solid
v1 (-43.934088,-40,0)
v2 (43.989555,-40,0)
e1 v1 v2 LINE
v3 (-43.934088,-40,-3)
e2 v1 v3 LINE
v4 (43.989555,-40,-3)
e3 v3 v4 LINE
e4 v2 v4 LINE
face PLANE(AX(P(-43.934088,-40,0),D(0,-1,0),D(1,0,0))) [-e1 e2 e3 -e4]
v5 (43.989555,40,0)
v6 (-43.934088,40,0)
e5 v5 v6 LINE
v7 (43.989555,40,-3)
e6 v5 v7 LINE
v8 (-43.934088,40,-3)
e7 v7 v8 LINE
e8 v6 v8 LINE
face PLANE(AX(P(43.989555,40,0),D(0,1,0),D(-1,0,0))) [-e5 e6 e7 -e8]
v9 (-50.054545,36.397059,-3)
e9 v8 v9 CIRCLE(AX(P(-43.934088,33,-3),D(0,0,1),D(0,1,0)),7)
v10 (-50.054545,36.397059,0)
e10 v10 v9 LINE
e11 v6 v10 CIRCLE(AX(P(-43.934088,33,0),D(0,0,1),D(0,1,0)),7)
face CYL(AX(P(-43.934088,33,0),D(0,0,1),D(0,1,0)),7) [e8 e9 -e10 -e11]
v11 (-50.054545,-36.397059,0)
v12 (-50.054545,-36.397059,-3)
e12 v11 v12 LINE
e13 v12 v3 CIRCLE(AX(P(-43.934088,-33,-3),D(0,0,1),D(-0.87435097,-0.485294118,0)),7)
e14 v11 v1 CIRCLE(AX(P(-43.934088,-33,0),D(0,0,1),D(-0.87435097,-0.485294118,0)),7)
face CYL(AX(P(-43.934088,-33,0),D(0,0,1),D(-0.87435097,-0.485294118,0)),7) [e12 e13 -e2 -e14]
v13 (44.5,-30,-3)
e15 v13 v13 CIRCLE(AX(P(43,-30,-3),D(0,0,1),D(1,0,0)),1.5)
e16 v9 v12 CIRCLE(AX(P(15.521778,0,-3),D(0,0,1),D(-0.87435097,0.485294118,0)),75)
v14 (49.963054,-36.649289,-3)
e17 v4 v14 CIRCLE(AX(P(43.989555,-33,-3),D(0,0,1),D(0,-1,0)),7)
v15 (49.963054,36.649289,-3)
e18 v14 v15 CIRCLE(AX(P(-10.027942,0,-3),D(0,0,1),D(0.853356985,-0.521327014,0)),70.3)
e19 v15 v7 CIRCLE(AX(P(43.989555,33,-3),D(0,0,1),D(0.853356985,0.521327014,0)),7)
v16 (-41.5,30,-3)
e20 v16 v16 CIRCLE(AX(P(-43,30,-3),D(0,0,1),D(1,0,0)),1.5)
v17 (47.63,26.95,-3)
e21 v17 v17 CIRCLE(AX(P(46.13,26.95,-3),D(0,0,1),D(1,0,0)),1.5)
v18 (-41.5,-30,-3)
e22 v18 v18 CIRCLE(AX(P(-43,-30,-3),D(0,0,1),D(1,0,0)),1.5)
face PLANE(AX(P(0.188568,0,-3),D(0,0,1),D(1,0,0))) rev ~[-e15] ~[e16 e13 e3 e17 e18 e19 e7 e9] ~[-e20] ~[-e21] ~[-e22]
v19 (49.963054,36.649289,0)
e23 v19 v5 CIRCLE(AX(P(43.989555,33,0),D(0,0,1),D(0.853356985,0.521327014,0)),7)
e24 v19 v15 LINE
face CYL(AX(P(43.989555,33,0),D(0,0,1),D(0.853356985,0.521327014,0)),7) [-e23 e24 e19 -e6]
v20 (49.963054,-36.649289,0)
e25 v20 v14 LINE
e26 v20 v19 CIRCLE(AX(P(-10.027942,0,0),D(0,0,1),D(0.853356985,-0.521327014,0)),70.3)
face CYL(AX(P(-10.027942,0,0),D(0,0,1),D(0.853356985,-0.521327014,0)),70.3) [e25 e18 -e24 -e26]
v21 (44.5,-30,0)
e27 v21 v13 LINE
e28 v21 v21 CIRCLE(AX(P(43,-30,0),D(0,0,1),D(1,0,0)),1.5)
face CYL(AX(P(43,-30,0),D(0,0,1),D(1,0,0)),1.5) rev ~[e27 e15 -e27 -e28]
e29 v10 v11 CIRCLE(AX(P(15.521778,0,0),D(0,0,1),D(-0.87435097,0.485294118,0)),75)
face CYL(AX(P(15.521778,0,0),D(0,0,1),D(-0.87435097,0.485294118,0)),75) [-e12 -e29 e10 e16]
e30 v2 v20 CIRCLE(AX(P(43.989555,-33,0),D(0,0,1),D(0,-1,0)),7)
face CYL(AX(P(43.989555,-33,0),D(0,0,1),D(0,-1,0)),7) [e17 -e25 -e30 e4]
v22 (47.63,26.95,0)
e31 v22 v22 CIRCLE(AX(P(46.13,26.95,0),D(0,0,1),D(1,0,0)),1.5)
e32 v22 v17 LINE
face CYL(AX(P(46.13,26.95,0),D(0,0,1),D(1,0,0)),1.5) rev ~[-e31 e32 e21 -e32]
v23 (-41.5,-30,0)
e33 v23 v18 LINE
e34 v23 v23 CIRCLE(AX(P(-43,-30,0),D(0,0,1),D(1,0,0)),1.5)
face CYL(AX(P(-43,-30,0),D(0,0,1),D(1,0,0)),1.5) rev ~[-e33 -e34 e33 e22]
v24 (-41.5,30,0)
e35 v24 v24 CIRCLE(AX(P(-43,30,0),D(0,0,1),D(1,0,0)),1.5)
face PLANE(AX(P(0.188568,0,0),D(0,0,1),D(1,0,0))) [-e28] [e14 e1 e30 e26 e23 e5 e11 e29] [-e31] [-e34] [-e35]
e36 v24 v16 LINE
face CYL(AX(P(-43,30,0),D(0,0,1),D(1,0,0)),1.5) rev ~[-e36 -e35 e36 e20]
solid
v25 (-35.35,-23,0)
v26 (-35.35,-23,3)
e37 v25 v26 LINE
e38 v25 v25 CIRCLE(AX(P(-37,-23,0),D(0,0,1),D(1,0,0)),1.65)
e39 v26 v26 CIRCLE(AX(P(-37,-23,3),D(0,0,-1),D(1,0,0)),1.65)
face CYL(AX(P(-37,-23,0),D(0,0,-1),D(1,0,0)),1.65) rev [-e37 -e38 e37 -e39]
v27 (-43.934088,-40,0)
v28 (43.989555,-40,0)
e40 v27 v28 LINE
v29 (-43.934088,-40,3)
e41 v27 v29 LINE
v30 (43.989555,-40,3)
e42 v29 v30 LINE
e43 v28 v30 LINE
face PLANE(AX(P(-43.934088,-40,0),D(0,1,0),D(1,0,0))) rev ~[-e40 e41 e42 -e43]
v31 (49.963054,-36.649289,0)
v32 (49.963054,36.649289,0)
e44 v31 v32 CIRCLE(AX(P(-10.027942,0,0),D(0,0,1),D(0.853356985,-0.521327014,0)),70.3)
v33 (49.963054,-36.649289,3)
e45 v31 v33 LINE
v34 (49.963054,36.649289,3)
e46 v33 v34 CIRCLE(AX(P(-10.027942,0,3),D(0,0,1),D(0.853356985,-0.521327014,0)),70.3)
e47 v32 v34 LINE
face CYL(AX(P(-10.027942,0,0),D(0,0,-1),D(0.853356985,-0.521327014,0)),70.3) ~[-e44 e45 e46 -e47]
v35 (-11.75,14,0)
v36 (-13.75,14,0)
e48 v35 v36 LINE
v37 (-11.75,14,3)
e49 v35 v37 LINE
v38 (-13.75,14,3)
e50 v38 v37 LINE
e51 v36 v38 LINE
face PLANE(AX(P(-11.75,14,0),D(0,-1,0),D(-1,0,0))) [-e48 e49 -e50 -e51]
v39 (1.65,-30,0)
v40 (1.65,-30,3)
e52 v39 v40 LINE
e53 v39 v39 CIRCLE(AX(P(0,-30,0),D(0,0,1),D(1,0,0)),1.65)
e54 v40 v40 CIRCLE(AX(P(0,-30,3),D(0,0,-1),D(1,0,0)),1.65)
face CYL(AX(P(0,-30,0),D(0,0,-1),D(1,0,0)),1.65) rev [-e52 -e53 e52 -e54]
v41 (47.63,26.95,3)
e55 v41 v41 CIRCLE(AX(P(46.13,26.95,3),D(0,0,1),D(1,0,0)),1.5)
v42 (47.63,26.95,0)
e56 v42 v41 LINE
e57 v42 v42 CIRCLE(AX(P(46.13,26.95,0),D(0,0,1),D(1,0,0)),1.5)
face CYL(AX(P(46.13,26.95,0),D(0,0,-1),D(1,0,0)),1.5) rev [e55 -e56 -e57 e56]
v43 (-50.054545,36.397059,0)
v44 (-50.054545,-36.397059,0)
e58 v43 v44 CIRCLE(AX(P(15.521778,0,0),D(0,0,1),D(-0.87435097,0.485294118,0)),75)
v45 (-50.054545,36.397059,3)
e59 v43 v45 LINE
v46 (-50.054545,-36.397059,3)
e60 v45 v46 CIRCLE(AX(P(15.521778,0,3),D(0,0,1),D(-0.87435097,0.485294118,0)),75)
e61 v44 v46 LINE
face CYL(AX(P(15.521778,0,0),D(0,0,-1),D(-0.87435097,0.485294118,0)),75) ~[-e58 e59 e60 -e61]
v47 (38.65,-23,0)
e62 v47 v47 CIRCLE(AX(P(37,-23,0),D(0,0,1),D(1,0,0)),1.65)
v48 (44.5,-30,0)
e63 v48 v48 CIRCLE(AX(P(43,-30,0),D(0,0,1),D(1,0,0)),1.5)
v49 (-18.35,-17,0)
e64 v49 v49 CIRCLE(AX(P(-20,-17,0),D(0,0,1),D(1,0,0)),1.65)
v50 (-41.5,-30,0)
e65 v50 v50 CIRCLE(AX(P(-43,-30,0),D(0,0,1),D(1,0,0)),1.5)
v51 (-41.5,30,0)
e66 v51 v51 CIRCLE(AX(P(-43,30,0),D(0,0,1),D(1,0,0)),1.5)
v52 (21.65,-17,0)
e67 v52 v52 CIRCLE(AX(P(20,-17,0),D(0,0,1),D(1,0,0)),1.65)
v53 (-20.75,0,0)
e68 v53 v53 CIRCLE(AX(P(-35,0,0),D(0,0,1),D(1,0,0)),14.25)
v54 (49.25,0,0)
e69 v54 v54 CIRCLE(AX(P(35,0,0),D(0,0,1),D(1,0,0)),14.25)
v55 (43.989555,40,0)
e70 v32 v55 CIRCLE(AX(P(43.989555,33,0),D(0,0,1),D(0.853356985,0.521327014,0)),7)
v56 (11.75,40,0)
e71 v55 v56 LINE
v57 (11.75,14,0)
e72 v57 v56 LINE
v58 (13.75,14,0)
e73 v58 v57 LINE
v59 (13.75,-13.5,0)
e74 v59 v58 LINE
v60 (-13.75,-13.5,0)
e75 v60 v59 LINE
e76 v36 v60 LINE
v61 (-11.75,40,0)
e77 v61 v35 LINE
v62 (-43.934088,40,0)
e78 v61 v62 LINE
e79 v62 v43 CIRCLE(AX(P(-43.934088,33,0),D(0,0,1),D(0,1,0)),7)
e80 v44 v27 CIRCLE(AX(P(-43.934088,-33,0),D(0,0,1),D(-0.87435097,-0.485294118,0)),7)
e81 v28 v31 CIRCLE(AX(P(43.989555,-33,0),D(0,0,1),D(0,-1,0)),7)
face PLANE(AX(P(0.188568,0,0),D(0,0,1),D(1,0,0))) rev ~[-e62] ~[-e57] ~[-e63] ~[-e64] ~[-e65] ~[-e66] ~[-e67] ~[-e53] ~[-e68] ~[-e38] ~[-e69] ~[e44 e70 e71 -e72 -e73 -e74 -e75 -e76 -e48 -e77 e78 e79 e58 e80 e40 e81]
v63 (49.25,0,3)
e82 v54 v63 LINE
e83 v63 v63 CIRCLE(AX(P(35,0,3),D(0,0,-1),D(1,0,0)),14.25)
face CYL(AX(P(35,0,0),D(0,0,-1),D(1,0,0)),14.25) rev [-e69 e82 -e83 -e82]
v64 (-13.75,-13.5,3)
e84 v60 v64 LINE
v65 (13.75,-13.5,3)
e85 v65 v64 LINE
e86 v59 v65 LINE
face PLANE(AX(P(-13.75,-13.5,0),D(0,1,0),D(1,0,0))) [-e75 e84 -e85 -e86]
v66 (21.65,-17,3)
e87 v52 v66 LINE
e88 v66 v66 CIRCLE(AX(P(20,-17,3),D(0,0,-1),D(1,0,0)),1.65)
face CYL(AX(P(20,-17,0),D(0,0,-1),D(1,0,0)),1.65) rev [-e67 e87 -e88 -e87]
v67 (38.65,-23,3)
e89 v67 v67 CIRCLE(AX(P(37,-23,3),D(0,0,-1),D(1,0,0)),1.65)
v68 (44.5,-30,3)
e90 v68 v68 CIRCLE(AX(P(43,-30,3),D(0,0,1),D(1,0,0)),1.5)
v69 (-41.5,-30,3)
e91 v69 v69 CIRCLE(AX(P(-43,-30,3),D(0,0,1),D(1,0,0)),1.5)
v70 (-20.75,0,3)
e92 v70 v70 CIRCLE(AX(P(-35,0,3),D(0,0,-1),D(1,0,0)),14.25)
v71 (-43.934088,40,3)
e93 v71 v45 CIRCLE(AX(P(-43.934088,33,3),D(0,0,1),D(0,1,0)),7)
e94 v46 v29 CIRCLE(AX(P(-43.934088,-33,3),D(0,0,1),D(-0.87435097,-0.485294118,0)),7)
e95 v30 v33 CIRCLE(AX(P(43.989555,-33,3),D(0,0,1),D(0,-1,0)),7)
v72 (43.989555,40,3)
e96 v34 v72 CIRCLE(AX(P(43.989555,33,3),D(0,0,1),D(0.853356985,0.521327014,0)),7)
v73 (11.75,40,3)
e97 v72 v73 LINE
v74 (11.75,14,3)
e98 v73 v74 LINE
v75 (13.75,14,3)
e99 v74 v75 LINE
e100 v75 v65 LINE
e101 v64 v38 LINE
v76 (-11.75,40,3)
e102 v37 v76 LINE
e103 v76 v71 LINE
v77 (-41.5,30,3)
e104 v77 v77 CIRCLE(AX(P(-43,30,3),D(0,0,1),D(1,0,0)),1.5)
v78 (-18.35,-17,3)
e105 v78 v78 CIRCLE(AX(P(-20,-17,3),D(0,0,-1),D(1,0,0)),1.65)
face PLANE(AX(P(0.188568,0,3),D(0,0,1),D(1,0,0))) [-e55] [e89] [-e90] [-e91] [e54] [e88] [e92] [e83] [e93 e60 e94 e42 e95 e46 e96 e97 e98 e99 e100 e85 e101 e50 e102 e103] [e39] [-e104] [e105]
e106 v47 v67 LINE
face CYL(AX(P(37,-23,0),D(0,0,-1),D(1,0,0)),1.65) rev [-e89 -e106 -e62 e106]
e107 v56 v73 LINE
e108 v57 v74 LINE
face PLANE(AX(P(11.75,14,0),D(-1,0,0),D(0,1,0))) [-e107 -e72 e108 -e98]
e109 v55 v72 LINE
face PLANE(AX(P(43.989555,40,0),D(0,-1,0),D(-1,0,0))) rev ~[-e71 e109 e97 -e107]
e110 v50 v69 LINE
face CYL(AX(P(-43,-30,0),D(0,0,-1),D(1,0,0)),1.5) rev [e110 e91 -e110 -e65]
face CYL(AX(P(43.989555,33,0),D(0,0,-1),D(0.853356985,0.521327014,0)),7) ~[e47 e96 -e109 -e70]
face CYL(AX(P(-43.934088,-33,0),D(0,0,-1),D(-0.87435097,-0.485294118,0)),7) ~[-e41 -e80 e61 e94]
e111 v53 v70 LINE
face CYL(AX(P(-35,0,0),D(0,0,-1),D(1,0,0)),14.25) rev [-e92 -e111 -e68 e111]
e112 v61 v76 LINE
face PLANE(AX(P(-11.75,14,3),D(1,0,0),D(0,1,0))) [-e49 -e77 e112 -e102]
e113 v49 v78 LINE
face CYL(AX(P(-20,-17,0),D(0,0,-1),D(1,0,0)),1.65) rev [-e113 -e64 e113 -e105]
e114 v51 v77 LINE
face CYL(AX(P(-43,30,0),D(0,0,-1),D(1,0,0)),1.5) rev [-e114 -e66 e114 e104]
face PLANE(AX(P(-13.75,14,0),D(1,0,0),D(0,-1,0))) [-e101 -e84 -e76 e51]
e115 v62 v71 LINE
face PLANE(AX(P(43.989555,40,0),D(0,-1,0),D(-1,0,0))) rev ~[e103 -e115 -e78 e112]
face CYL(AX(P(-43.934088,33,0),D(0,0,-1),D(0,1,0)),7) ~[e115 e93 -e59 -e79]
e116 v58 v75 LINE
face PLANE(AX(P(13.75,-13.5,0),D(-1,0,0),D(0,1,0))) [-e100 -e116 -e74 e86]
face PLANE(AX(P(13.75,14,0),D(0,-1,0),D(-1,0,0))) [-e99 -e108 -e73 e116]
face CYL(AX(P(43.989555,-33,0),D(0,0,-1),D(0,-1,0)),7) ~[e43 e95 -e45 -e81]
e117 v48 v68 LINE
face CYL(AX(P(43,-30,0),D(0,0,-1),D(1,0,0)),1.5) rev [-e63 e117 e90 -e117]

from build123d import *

# Parameters (mm, degrees)
F0_R     = 1.5
F1_DEPTH = 3
F2_DEPTH = 3
F3_R     = 14.25
F3_R_2   = 1.65
F4_DEPTH = 25
F6_DEPTH = 3
F7_DEPTH = 3
F8_W     = 23.5
F8_H     = 37.6963340342
F9_DEPTH = 25


with BuildPart() as f1:
    # F0 (on Top) → F1 (new body)
    with BuildSketch(Plane.XY):
        with BuildLine():
            Line((45.1, 35), (-45.1, 35))
            ThreePointArc((-45.1, 35), (-54.4782217351, 0), (-45.1, -35))
            Line((-45.1, -35), (45.1, -35))
            ThreePointArc((45.1, -35), (55.2720579016, 0), (45.1, 35))
        make_face()
        with Locations((-43, -30)):
            Circle(F0_R, mode=Mode.SUBTRACT)
        with Locations((43, -30)):
            Circle(F0_R, mode=Mode.SUBTRACT)
        with Locations((-43, 30)):
            Circle(F0_R, mode=Mode.SUBTRACT)
        with Locations((46.13, 26.95)):
            Circle(F0_R, mode=Mode.SUBTRACT)
    extrude(amount=-F1_DEPTH)

    # F5 (on Top) → F6 (join)
    with BuildSketch(Plane.XY):
        with BuildLine():
            ThreePointArc((-50.0545445124, 36.3970588235), (-59.4782217351, 0), (-50.0545445124, -36.3970588235))
            ThreePointArc((-50.0545445124, -36.3970588235), (-47.4851853132, -39.0323880746), (-43.9340877199, -40))
            Line((-43.9340877199, -40), (43.9895550669, -40))
            ThreePointArc((43.9895550669, -40), (47.4140971022, -39.1051217718), (49.9630539635, -36.6492890995))
            ThreePointArc((49.9630539635, -36.6492890995), (60.2720579016, 0), (49.9630539635, 36.6492890995))
            ThreePointArc((49.9630539635, 36.6492890995), (47.4140971022, 39.1051217718), (43.9895550669, 40))
            Line((43.9895550669, 40), (-43.9340877199, 40))
            ThreePointArc((-43.9340877199, 40), (-47.4851853132, 39.0323880746), (-50.0545445124, 36.3970588235))
        make_face()
        with BuildLine():
            Line((44.5476018751, -34), (-44.5198739442, -34))
            ThreePointArc((-44.5198739442, -34), (-53.4782217351, 0), (-44.5198739442, 34))
            Line((-44.5198739442, 34), (44.5476018751, 34))
            ThreePointArc((44.5476018751, 34), (54.2720579016, 0), (44.5476018751, -34))
        make_face(mode=Mode.SUBTRACT)
    extrude(amount=-F6_DEPTH)


with BuildPart() as f2:
    # F0 (on Top) → F2 (new body)
    with BuildSketch(Plane.XY):
        with BuildLine():
            Line((45.1, 35), (-45.1, 35))
            ThreePointArc((-45.1, 35), (-54.4782217351, 0), (-45.1, -35))
            Line((-45.1, -35), (45.1, -35))
            ThreePointArc((45.1, -35), (55.2720579016, 0), (45.1, 35))
        make_face()
        with Locations((-43, -30)):
            Circle(F0_R, mode=Mode.SUBTRACT)
        with Locations((43, -30)):
            Circle(F0_R, mode=Mode.SUBTRACT)
        with Locations((-43, 30)):
            Circle(F0_R, mode=Mode.SUBTRACT)
        with Locations((46.13, 26.95)):
            Circle(F0_R, mode=Mode.SUBTRACT)
    extrude(amount=F2_DEPTH)

    # F3 (on Top) → F4 (cut)
    with BuildSketch(Plane.XY):
        Polygon((-11.75, 14), (-13.75, 14), (-13.75, -13.5), (13.75, -13.5), (13.75, 14), (11.75, 14), (11.75, 43.5743890703), (-11.75, 43.5743890703), align=None)
        with Locations((-35, 0)):
            Circle(F3_R)
        with Locations((35, 0)):
            Circle(F3_R)
        with Locations((-37, -23)):
            Circle(F3_R_2)
        with Locations((-20, -17)):
            Circle(F3_R_2)
        with Locations((0, -30)):
            Circle(F3_R_2)
        with Locations((37, -23)):
            Circle(F3_R_2)
        with Locations((20, -17)):
            Circle(F3_R_2)
    extrude(amount=F4_DEPTH, mode=Mode.SUBTRACT)

    # F5 (on Top) → F7 (join)
    with BuildSketch(Plane.XY):
        with BuildLine():
            ThreePointArc((-50.0545445124, 36.3970588235), (-59.4782217351, 0), (-50.0545445124, -36.3970588235))
            ThreePointArc((-50.0545445124, -36.3970588235), (-47.4851853132, -39.0323880746), (-43.9340877199, -40))
            Line((-43.9340877199, -40), (43.9895550669, -40))
            ThreePointArc((43.9895550669, -40), (47.4140971022, -39.1051217718), (49.9630539635, -36.6492890995))
            ThreePointArc((49.9630539635, -36.6492890995), (60.2720579016, 0), (49.9630539635, 36.6492890995))
            ThreePointArc((49.9630539635, 36.6492890995), (47.4140971022, 39.1051217718), (43.9895550669, 40))
            Line((43.9895550669, 40), (-43.9340877199, 40))
            ThreePointArc((-43.9340877199, 40), (-47.4851853132, 39.0323880746), (-50.0545445124, 36.3970588235))
        make_face()
        with BuildLine():
            Line((44.5476018751, -34), (-44.5198739442, -34))
            ThreePointArc((-44.5198739442, -34), (-53.4782217351, 0), (-44.5198739442, 34))
            Line((-44.5198739442, 34), (44.5476018751, 34))
            ThreePointArc((44.5476018751, 34), (54.2720579016, 0), (44.5476018751, -34))
        make_face(mode=Mode.SUBTRACT)
    extrude(amount=F7_DEPTH)

    # F8 (on face) → F9 (cut)
    with BuildSketch(Plane.XY.offset(3)):
        with Locations((0, 32.8481670171)):
            Rectangle(F8_W, F8_H)
    extrude(amount=-F9_DEPTH, mode=Mode.SUBTRACT)


solid = Compound([f1.part, f2.part])
